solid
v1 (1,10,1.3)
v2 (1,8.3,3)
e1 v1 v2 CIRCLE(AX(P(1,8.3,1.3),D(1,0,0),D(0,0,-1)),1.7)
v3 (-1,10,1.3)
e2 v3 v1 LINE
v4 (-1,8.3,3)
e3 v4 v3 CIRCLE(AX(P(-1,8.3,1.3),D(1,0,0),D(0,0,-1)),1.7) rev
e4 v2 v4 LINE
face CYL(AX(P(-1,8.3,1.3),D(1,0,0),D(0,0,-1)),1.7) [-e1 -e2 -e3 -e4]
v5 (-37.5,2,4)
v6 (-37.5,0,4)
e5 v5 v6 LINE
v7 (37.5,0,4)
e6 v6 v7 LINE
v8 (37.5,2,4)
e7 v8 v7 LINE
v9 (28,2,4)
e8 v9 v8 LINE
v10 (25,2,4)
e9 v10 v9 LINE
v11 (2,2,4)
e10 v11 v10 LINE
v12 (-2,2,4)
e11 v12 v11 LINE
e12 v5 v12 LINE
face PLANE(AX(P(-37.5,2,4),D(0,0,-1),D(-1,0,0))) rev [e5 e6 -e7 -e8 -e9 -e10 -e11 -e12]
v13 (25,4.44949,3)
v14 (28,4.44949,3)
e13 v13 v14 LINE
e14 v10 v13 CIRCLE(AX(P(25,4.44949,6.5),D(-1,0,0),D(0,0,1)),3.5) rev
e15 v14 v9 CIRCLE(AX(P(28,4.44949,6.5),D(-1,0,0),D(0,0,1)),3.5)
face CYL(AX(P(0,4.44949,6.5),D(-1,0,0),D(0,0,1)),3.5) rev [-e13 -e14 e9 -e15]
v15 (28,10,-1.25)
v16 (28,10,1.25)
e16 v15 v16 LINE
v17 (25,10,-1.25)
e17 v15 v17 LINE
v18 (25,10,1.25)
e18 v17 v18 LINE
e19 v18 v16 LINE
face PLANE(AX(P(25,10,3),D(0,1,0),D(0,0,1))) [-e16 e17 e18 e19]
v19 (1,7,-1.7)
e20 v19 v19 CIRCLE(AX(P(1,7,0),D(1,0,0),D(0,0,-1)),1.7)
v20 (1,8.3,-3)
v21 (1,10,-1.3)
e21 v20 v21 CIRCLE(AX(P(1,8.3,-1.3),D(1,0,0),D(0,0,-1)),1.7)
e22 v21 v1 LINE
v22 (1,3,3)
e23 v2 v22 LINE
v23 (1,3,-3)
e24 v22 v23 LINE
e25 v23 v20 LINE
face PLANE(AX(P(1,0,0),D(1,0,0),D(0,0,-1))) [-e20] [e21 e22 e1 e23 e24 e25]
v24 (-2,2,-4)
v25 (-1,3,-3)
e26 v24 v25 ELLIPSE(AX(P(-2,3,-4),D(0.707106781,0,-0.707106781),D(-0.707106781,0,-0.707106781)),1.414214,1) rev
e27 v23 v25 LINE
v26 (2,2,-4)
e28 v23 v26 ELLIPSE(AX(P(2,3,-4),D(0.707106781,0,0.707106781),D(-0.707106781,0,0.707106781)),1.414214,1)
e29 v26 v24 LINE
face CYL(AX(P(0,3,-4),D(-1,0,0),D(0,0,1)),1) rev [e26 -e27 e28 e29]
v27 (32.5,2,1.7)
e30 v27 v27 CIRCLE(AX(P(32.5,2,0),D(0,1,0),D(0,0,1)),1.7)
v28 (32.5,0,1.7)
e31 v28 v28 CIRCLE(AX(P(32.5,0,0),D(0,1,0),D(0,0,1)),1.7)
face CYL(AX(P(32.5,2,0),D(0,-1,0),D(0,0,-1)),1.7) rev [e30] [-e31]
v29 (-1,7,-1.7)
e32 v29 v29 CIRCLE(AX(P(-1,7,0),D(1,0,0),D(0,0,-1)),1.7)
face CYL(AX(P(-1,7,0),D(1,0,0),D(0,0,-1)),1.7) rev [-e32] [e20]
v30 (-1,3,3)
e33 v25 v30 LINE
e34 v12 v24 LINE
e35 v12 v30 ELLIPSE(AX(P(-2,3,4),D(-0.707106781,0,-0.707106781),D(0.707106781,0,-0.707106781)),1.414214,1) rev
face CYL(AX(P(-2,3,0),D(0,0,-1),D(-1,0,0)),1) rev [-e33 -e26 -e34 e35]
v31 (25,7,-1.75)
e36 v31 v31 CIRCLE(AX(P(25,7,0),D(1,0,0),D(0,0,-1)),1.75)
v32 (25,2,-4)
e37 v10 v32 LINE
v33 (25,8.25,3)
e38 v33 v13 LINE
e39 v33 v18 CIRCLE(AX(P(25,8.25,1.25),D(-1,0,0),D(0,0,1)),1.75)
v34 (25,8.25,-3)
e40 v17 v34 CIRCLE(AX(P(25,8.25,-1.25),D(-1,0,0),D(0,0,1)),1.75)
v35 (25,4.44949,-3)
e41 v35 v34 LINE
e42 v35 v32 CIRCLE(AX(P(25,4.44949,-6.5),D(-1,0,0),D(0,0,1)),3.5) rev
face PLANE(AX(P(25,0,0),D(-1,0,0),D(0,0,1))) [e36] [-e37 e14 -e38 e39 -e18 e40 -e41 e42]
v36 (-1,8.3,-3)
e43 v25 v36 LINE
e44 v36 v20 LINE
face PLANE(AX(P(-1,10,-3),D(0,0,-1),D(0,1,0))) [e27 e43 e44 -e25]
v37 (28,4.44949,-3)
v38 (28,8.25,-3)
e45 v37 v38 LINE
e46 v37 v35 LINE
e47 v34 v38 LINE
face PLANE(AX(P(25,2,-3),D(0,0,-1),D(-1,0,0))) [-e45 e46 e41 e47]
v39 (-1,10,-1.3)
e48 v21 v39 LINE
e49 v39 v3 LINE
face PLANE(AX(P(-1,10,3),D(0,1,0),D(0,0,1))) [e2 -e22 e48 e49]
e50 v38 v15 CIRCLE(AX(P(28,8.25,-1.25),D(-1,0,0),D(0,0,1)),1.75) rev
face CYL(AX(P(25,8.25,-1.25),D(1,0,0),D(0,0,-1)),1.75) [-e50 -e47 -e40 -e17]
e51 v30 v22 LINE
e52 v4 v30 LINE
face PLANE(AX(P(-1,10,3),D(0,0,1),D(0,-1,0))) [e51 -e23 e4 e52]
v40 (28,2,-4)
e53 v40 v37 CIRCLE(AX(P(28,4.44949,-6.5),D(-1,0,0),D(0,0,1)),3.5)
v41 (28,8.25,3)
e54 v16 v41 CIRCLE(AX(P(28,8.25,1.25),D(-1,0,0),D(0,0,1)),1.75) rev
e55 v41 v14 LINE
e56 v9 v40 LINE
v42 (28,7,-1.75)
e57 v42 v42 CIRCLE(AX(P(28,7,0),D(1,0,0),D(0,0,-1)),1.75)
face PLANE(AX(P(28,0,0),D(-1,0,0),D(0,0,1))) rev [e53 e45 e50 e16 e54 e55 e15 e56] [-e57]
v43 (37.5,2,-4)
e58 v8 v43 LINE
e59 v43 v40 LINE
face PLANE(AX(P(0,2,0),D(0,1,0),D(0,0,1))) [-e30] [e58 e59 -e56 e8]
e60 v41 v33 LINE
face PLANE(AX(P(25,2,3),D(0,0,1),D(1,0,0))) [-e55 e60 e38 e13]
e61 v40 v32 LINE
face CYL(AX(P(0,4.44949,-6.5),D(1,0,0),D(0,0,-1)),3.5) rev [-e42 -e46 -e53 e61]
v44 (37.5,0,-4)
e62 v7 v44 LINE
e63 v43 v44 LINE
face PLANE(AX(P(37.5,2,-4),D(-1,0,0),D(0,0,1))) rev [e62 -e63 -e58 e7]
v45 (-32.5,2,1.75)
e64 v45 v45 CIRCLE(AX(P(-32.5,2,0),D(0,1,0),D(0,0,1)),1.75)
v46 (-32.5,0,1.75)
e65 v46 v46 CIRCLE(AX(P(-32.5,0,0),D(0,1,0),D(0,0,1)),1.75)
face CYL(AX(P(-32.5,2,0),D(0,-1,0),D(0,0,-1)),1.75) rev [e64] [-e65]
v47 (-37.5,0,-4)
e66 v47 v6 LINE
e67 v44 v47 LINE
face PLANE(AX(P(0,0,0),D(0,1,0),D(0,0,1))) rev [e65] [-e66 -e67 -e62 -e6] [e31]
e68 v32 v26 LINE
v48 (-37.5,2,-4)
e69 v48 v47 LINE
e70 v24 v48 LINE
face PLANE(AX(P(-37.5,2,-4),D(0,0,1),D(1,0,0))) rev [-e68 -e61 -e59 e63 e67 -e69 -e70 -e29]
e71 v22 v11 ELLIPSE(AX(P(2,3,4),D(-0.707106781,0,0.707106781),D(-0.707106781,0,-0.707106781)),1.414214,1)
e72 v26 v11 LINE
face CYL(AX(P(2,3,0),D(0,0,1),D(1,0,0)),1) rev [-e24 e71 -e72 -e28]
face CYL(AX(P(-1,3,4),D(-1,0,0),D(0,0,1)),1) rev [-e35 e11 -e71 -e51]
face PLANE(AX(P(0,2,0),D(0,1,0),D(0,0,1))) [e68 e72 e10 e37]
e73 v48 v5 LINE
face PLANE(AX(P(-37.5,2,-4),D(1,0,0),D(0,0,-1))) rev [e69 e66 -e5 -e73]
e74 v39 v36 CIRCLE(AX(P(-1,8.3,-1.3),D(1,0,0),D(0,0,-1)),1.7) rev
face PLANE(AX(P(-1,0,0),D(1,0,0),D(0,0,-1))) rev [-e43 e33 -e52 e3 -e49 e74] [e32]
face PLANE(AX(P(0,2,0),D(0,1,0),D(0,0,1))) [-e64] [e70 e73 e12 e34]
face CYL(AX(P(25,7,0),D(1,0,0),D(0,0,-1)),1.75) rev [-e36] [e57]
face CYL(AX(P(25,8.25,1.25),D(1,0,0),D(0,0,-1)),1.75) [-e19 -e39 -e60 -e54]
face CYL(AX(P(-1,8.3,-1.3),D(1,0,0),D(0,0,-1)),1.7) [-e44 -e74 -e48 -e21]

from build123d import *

# Parameters (mm, degrees)
SKETCH_1_W           = 75
SKETCH_1_H           = 8
SKETCH_1_R           = 1.75
SKETCH_1_R_2         = 1.7
EXTRUDE_1_DEPTH      = 2
EXTRUDE_2_DEPTH      = 1
EXTRUDE_2_DEPTH_BACK = 1
SKETCH_2_W           = 6
SKETCH_2_H           = 8
SKETCH_2_R           = 1.7
FILLET_2_R           = 1
FILLET_3_R           = 1.7
SKETCH_3_W           = 6
SKETCH_3_H           = 8
SKETCH_3_R           = 1.75
EXTRUDE_3_DEPTH      = 3
FILLET_6_R           = 1.75
FILLET_7_R           = 3.5


# Some blends are built 0.0001 mm under size
with BuildPart() as part:
    # 草图1 → 凸台-拉伸1 (new body)
    with BuildSketch(Plane(origin=(0, 0, 0), x_dir=(1, 0, 0), z_dir=(0, 1, 0))):
        Rectangle(SKETCH_1_W, SKETCH_1_H)
        with Locations(Location((-32.5, 0, 0), (0, 0, 270))):
            Circle(SKETCH_1_R, mode=Mode.SUBTRACT)
        with Locations(Location((32.5, 0, 0), (0, 0, 270))):
            Circle(SKETCH_1_R_2, mode=Mode.SUBTRACT)
    extrude(amount=EXTRUDE_1_DEPTH)

    # 草图2 → 凸台-拉伸2 (add, two sides: drawn at the far end of the back side and taken through both)
    with BuildSketch(Plane(origin=(0, 0, 0), x_dir=(0, 0, -1), z_dir=(1, 0, 0)).offset(-EXTRUDE_2_DEPTH_BACK)):
        with Locations((0, 6)):
            Rectangle(SKETCH_2_W, SKETCH_2_H)
        with Locations((0, 7)):
            Circle(SKETCH_2_R, mode=Mode.SUBTRACT)
    extrude(amount=EXTRUDE_2_DEPTH + EXTRUDE_2_DEPTH_BACK)

    # 圆角2
    fillet_2_edges = [part.edges().sort_by_distance(p)[0] for p in [
        (0, 2, -3),
        (-1, 2, 0),
        (0, 2, 3),
        (1, 2, 0),
    ]]
    fillet(fillet_2_edges, radius=FILLET_2_R - 0.0001)  # a hair under: the kernel refuses the full size

    # 圆角3
    fillet_3_edges = [part.edges().sort_by_distance(p)[0] for p in [
        (0, 10, -3),
        (0, 10, 3),
    ]]
    fillet(fillet_3_edges, radius=FILLET_3_R)

    # 草图3 → 凸台-拉伸3 (add)
    with BuildSketch(Plane(origin=(28, 0, 0), x_dir=(0, 0, -1), z_dir=(1, 0, 0))):
        with Locations((0, 6)):
            Rectangle(SKETCH_3_W, SKETCH_3_H)
        with Locations((0, 7)):
            Circle(SKETCH_3_R, mode=Mode.SUBTRACT)
    extrude(amount=-EXTRUDE_3_DEPTH)

    # 圆角6
    fillet_6_edges = [part.edges().sort_by_distance(p)[0] for p in [
        (26.5, 10, -3),
        (26.5, 10, 3),
    ]]
    fillet(fillet_6_edges, radius=FILLET_6_R)

    # 圆角7
    # the kernel refuses this fillet: 3.5 mm, written as the material it adds along each edge
    with BuildSketch(Plane(origin=(28, 2, -3), x_dir=(0, 0, -1), z_dir=(-1, 0, 0))) as fillet_7_piece_1:
        with BuildLine():
            CenterArc((3.5, -2.449489743), FILLET_7_R, 135.584691403, 44.415308597)
            Line((0, -2.449489743), (-0.07, -2.449489743))
            Line((-0.07, -2.449489743), (-0.07, 0))
            Line((-0.07, 0), (0, 0.07))
            ThreePointArc((0, 0.07), (0.5, 0.07), (0.95, 0.048989795))
            Line((0.95, 0.048989795), (1, 0))
        make_face()
    extrude(amount=3)
    with BuildSketch(Plane(origin=(28, 2, 3), x_dir=(0, 1, 0), z_dir=(-1, 0, 0))) as fillet_7_piece_2:
        with BuildLine():
            CenterArc((2.449489743, -3.5), FILLET_7_R, 90, 44.415308597)
            Line((0, -1), (-0.048989795, -0.95))
            ThreePointArc((-0.048989795, -0.95), (-0.07, -0.5), (-0.07, 0))
            Line((-0.07, 0), (0, 0.07))
            Line((0, 0.07), (2.449489743, 0.07))
            Line((2.449489743, 0.07), (2.449489743, 0))
        make_face()
    extrude(amount=3)


solid = part.part
